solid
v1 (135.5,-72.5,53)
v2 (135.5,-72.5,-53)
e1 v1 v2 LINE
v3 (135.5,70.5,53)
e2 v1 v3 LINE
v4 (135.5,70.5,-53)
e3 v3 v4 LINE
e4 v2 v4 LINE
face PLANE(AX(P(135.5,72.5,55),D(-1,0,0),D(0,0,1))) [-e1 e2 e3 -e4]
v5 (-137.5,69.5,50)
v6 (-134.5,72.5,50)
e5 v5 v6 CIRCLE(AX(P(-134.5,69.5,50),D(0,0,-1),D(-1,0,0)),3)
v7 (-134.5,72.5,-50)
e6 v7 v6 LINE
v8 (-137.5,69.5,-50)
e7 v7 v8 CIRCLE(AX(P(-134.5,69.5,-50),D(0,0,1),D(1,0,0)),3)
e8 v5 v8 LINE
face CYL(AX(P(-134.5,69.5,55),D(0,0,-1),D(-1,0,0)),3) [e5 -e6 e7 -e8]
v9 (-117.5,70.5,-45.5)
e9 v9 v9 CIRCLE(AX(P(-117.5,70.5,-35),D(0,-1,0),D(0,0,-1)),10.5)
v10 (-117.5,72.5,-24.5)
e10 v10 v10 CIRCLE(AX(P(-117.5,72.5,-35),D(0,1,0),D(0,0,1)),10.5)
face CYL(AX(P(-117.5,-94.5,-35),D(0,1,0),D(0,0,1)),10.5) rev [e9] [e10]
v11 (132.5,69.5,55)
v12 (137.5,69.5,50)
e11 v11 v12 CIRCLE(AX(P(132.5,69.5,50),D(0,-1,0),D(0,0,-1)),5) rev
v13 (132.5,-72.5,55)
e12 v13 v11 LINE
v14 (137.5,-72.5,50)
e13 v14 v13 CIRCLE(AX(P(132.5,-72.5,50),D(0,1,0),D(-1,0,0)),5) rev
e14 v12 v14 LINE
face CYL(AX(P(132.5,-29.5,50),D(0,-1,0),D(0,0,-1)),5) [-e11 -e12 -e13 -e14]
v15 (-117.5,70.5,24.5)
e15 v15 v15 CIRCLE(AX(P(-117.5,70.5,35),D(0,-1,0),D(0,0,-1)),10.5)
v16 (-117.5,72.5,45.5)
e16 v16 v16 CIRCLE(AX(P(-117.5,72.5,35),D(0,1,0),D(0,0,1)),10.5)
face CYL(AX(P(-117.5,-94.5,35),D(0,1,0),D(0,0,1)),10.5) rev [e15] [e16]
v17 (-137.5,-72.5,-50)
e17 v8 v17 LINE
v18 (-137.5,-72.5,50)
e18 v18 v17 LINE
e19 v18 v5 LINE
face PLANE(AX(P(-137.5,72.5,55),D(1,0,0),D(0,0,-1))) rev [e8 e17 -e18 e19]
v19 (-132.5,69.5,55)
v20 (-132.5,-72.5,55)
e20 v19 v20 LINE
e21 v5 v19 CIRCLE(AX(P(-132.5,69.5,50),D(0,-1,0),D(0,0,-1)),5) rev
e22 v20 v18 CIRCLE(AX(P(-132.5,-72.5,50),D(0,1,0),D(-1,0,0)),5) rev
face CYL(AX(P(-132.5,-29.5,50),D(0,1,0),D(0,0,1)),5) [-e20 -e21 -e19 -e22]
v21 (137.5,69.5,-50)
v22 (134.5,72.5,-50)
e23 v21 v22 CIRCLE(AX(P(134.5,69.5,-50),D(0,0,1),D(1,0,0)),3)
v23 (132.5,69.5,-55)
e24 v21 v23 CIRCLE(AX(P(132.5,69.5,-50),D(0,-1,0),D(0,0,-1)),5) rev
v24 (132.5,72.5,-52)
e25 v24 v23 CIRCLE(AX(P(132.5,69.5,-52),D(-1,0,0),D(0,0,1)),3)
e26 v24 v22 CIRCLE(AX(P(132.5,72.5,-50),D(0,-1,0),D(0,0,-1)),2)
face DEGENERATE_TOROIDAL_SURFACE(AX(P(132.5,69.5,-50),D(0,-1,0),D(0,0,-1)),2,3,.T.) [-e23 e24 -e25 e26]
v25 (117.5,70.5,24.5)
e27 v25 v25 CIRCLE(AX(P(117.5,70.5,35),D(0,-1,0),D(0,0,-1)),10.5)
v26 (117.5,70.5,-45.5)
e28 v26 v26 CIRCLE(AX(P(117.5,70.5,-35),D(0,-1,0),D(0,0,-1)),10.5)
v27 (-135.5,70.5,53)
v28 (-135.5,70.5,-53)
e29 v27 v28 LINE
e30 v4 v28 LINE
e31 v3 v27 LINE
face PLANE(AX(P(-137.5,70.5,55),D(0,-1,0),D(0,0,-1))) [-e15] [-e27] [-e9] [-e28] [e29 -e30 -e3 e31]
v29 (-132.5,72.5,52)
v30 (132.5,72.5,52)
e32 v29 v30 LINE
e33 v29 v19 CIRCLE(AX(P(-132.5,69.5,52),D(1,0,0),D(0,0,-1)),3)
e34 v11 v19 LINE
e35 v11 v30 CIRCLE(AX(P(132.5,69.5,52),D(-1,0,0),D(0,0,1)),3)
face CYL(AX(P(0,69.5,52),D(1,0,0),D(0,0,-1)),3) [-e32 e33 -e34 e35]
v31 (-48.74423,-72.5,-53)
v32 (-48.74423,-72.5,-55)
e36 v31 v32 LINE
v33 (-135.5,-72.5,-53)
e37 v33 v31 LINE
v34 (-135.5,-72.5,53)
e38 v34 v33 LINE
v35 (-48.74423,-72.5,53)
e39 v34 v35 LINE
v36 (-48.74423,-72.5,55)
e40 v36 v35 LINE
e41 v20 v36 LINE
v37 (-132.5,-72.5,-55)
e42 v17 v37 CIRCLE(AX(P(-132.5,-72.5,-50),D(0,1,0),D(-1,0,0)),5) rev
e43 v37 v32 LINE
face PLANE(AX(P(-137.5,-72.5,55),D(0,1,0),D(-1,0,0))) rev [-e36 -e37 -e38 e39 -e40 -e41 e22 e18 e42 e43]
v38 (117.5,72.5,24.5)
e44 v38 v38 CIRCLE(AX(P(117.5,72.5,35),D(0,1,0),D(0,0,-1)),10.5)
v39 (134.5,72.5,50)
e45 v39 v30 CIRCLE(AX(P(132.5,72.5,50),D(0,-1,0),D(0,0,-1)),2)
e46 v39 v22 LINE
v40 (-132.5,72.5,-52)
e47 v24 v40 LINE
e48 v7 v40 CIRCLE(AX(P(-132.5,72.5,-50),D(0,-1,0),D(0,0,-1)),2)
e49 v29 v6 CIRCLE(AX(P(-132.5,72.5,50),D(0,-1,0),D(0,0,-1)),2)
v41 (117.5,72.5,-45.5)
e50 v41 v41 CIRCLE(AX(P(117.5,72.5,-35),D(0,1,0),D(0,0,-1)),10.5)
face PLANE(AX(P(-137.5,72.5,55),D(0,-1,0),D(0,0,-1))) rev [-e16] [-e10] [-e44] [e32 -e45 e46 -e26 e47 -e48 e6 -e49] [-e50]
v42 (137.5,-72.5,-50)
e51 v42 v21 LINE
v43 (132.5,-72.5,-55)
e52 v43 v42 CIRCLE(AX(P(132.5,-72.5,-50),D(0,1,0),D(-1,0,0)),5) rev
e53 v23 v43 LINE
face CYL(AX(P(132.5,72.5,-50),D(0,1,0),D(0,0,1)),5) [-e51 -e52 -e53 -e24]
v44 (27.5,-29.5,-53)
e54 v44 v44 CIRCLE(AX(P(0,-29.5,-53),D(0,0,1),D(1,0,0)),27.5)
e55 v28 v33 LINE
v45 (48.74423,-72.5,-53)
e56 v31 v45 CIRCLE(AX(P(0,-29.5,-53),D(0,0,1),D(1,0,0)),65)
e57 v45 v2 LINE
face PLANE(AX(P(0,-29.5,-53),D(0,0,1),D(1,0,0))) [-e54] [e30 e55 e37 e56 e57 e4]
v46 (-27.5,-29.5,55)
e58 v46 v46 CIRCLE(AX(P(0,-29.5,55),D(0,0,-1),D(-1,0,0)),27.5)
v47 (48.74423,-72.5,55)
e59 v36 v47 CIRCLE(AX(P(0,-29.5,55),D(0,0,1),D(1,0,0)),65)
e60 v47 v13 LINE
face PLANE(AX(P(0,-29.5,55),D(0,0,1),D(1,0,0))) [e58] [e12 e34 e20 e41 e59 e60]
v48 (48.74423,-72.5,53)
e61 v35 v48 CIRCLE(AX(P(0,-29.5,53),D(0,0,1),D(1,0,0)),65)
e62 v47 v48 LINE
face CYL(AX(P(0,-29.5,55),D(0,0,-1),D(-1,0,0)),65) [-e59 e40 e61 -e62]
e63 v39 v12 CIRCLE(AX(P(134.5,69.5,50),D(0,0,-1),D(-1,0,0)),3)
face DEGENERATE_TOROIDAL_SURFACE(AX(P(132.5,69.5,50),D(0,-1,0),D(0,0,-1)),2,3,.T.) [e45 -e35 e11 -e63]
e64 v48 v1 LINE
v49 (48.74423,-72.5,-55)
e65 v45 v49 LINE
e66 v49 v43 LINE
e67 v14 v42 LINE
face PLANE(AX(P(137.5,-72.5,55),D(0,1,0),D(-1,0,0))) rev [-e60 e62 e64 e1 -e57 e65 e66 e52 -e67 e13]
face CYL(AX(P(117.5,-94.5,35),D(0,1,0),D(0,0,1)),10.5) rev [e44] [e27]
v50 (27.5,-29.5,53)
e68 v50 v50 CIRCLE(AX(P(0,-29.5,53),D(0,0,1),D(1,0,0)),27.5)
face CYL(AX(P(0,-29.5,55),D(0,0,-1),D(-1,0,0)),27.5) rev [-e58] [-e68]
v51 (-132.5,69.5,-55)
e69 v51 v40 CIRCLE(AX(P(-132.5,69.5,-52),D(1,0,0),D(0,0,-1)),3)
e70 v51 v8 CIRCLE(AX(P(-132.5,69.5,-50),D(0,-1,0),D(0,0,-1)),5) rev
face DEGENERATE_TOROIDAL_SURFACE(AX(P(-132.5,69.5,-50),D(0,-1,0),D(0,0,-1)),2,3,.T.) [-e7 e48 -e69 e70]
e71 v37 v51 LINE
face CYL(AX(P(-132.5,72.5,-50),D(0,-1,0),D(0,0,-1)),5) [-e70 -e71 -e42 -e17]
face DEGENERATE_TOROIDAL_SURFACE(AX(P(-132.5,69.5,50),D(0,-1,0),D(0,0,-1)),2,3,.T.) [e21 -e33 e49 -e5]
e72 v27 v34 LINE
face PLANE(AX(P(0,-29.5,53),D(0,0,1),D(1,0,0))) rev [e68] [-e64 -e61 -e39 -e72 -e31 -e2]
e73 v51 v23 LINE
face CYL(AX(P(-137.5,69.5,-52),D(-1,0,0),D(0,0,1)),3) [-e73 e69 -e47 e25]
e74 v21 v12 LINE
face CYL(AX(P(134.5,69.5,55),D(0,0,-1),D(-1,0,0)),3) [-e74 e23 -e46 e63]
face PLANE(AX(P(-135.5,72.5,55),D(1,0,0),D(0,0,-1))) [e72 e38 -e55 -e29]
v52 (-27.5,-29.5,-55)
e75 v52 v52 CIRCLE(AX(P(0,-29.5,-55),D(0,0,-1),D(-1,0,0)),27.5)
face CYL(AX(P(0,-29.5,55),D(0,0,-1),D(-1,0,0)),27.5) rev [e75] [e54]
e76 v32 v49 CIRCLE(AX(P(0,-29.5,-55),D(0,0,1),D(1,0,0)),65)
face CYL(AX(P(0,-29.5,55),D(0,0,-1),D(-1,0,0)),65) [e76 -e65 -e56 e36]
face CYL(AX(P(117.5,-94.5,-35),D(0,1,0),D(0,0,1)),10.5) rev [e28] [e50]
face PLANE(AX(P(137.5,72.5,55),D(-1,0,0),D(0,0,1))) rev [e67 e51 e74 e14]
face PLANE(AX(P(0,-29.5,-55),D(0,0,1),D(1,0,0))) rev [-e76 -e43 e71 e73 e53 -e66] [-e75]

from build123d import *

# Parameters (mm, degrees)
BOSS_EXTRU_1_DEPTH      = 55
COQUE1_T                = -2
ESQUISSE2_R             = 27.5
ENL_V_MAT_EXTRU_1_DEPTH = 200.841186946
ESQUISSE3_R             = 10.5
ENL_V_MAT_EXTRU_2_DEPTH = 224.204502643
CONG_2_R                = 3
CONG_3_R                = 5


with BuildPart() as part:
    # Esquisse1 → Boss.-Extru.1 (new, symmetric)
    with BuildSketch(Plane.XY):
        with BuildLine():
            Line((-137.5, 72.5), (137.5, 72.5))
            Line((137.5, 72.5), (137.5, -72.5))
            Line((137.5, -72.5), (48.744230428, -72.5))
            ThreePointArc((48.744230428, -72.5), (0, -94.5), (-48.744230428, -72.5))
            Line((-48.744230428, -72.5), (-137.5, -72.5))
            Line((-137.5, -72.5), (-137.5, 72.5))
        make_face()
    extrude(amount=BOSS_EXTRU_1_DEPTH, both=True)

    # Coque1
    coque1_openings = [part.faces().sort_by_distance(p)[0] for p in [
        (93.122115214, -72.5, 0),
        (0, -94.5, 0),
        (-93.122115214, -72.5, 0),
    ]]
    offset(amount=COQUE1_T, openings=coque1_openings, kind=Kind.INTERSECTION)

    # Esquisse2 → Enlèv. mat.-Extru.1 (cut, through all)
    with BuildSketch(Plane(origin=(0, 0, -55), x_dir=(-1, 0, 0), z_dir=(0, 0, -1))):
        with Locations((0, -29.5)):
            Circle(ESQUISSE2_R)
    extrude(amount=-ENL_V_MAT_EXTRU_1_DEPTH, mode=Mode.SUBTRACT)

    # Esquisse3 → Enlèv. mat.-Extru.2 (cut, through all)
    with BuildSketch(Plane(origin=(0, 72.5, 0), x_dir=(1, 0, 0), z_dir=(0, 1, 0))):
        with Locations(Location((-117.5, 35, 0), (0, 0, 270))):
            Circle(ESQUISSE3_R)
        with Locations(Location((-117.5, -35, 0), (0, 0, 270))):
            Circle(ESQUISSE3_R)
        with Locations(Location((117.5, 35, 0), (0, 0, 90))):
            Circle(ESQUISSE3_R)
        with Locations(Location((117.5, -35, 0), (0, 0, 90))):
            Circle(ESQUISSE3_R)
    extrude(amount=-ENL_V_MAT_EXTRU_2_DEPTH, mode=Mode.SUBTRACT)

    # Congé2
    cong_2_edges = [part.edges().sort_by_distance(p)[0] for p in [
        (-137.5, 72.5, 0),
        (137.5, 72.5, 0),
        (0, 72.5, 55),
        (0, 72.5, -55),
    ]]
    fillet(cong_2_edges, radius=CONG_2_R)

    # Congé3
    # the kernel refuses this fillet: 5 mm, written as the material it takes off along each edge
    with BuildSketch(Plane(origin=(-132.5, 72.5, 50), x_dir=(-1, 0, 0), z_dir=(0, 0, -1))) as cong_3_piece_1:
        with BuildLine():
            CenterArc((2, -3), 3, 0, 90)
            Line((5, -3), (5, 0))
            Line((5, 0), (2, 0))
        make_face()
    revolve(axis=Axis((-132.5, 72.5, 50), (0, 1, 0)), revolution_arc=90, mode=Mode.SUBTRACT)
    with BuildSketch(Plane(origin=(-132.5, 72.5, -50), x_dir=(0, 0, -1), z_dir=(1, 0, 0))) as cong_3_piece_2:
        with BuildLine():
            CenterArc((2, -3), 3, 0, 90)
            Line((5, -3), (5, 0))
            Line((5, 0), (2, 0))
        make_face()
    revolve(axis=Axis((-132.5, 72.5, -50), (0, 1, 0)), revolution_arc=90, mode=Mode.SUBTRACT)
    with BuildSketch(Plane(origin=(132.5, 72.5, 50), x_dir=(0, 0, 1), z_dir=(-1, 0, 0))) as cong_3_piece_3:
        with BuildLine():
            CenterArc((2, -3), 3, 0, 90)
            Line((5, -3), (5, 0))
            Line((5, 0), (2, 0))
        make_face()
    revolve(axis=Axis((132.5, 72.5, 50), (0, 1, 0)), revolution_arc=90, mode=Mode.SUBTRACT)
    with BuildSketch(Plane(origin=(132.5, 72.5, -50), x_dir=(1, 0, 0), z_dir=(0, 0, 1))) as cong_3_piece_4:
        with BuildLine():
            CenterArc((2, -3), 3, 0, 90)
            Line((5, -3), (5, 0))
            Line((5, 0), (2, 0))
        make_face()
    revolve(axis=Axis((132.5, 72.5, -50), (0, 1, 0)), revolution_arc=90, mode=Mode.SUBTRACT)
    with BuildSketch(Plane(origin=(137.5, 72.5, 55), x_dir=(-1, 0, 0), z_dir=(0, -1, 0)), Plane(origin=(137.5, 72.5, -55), x_dir=(0, 0, 1), z_dir=(0, -1, 0)), Plane(origin=(-137.5, -85, -55), x_dir=(0, 0, 1), z_dir=(0, 1, 0)), Plane(origin=(-137.5, -85, 55), x_dir=(1, 0, 0), z_dir=(0, 1, 0))) as cong_3_piece_5:
        with BuildLine():
            CenterArc((CONG_3_R, CONG_3_R), CONG_3_R, 180, 90)
            Line((0, CONG_3_R), (0, 0))
            Line((0, 0), (CONG_3_R, 0))
        make_face()
    extrude(amount=157.5, mode=Mode.SUBTRACT)


solid = part.part
